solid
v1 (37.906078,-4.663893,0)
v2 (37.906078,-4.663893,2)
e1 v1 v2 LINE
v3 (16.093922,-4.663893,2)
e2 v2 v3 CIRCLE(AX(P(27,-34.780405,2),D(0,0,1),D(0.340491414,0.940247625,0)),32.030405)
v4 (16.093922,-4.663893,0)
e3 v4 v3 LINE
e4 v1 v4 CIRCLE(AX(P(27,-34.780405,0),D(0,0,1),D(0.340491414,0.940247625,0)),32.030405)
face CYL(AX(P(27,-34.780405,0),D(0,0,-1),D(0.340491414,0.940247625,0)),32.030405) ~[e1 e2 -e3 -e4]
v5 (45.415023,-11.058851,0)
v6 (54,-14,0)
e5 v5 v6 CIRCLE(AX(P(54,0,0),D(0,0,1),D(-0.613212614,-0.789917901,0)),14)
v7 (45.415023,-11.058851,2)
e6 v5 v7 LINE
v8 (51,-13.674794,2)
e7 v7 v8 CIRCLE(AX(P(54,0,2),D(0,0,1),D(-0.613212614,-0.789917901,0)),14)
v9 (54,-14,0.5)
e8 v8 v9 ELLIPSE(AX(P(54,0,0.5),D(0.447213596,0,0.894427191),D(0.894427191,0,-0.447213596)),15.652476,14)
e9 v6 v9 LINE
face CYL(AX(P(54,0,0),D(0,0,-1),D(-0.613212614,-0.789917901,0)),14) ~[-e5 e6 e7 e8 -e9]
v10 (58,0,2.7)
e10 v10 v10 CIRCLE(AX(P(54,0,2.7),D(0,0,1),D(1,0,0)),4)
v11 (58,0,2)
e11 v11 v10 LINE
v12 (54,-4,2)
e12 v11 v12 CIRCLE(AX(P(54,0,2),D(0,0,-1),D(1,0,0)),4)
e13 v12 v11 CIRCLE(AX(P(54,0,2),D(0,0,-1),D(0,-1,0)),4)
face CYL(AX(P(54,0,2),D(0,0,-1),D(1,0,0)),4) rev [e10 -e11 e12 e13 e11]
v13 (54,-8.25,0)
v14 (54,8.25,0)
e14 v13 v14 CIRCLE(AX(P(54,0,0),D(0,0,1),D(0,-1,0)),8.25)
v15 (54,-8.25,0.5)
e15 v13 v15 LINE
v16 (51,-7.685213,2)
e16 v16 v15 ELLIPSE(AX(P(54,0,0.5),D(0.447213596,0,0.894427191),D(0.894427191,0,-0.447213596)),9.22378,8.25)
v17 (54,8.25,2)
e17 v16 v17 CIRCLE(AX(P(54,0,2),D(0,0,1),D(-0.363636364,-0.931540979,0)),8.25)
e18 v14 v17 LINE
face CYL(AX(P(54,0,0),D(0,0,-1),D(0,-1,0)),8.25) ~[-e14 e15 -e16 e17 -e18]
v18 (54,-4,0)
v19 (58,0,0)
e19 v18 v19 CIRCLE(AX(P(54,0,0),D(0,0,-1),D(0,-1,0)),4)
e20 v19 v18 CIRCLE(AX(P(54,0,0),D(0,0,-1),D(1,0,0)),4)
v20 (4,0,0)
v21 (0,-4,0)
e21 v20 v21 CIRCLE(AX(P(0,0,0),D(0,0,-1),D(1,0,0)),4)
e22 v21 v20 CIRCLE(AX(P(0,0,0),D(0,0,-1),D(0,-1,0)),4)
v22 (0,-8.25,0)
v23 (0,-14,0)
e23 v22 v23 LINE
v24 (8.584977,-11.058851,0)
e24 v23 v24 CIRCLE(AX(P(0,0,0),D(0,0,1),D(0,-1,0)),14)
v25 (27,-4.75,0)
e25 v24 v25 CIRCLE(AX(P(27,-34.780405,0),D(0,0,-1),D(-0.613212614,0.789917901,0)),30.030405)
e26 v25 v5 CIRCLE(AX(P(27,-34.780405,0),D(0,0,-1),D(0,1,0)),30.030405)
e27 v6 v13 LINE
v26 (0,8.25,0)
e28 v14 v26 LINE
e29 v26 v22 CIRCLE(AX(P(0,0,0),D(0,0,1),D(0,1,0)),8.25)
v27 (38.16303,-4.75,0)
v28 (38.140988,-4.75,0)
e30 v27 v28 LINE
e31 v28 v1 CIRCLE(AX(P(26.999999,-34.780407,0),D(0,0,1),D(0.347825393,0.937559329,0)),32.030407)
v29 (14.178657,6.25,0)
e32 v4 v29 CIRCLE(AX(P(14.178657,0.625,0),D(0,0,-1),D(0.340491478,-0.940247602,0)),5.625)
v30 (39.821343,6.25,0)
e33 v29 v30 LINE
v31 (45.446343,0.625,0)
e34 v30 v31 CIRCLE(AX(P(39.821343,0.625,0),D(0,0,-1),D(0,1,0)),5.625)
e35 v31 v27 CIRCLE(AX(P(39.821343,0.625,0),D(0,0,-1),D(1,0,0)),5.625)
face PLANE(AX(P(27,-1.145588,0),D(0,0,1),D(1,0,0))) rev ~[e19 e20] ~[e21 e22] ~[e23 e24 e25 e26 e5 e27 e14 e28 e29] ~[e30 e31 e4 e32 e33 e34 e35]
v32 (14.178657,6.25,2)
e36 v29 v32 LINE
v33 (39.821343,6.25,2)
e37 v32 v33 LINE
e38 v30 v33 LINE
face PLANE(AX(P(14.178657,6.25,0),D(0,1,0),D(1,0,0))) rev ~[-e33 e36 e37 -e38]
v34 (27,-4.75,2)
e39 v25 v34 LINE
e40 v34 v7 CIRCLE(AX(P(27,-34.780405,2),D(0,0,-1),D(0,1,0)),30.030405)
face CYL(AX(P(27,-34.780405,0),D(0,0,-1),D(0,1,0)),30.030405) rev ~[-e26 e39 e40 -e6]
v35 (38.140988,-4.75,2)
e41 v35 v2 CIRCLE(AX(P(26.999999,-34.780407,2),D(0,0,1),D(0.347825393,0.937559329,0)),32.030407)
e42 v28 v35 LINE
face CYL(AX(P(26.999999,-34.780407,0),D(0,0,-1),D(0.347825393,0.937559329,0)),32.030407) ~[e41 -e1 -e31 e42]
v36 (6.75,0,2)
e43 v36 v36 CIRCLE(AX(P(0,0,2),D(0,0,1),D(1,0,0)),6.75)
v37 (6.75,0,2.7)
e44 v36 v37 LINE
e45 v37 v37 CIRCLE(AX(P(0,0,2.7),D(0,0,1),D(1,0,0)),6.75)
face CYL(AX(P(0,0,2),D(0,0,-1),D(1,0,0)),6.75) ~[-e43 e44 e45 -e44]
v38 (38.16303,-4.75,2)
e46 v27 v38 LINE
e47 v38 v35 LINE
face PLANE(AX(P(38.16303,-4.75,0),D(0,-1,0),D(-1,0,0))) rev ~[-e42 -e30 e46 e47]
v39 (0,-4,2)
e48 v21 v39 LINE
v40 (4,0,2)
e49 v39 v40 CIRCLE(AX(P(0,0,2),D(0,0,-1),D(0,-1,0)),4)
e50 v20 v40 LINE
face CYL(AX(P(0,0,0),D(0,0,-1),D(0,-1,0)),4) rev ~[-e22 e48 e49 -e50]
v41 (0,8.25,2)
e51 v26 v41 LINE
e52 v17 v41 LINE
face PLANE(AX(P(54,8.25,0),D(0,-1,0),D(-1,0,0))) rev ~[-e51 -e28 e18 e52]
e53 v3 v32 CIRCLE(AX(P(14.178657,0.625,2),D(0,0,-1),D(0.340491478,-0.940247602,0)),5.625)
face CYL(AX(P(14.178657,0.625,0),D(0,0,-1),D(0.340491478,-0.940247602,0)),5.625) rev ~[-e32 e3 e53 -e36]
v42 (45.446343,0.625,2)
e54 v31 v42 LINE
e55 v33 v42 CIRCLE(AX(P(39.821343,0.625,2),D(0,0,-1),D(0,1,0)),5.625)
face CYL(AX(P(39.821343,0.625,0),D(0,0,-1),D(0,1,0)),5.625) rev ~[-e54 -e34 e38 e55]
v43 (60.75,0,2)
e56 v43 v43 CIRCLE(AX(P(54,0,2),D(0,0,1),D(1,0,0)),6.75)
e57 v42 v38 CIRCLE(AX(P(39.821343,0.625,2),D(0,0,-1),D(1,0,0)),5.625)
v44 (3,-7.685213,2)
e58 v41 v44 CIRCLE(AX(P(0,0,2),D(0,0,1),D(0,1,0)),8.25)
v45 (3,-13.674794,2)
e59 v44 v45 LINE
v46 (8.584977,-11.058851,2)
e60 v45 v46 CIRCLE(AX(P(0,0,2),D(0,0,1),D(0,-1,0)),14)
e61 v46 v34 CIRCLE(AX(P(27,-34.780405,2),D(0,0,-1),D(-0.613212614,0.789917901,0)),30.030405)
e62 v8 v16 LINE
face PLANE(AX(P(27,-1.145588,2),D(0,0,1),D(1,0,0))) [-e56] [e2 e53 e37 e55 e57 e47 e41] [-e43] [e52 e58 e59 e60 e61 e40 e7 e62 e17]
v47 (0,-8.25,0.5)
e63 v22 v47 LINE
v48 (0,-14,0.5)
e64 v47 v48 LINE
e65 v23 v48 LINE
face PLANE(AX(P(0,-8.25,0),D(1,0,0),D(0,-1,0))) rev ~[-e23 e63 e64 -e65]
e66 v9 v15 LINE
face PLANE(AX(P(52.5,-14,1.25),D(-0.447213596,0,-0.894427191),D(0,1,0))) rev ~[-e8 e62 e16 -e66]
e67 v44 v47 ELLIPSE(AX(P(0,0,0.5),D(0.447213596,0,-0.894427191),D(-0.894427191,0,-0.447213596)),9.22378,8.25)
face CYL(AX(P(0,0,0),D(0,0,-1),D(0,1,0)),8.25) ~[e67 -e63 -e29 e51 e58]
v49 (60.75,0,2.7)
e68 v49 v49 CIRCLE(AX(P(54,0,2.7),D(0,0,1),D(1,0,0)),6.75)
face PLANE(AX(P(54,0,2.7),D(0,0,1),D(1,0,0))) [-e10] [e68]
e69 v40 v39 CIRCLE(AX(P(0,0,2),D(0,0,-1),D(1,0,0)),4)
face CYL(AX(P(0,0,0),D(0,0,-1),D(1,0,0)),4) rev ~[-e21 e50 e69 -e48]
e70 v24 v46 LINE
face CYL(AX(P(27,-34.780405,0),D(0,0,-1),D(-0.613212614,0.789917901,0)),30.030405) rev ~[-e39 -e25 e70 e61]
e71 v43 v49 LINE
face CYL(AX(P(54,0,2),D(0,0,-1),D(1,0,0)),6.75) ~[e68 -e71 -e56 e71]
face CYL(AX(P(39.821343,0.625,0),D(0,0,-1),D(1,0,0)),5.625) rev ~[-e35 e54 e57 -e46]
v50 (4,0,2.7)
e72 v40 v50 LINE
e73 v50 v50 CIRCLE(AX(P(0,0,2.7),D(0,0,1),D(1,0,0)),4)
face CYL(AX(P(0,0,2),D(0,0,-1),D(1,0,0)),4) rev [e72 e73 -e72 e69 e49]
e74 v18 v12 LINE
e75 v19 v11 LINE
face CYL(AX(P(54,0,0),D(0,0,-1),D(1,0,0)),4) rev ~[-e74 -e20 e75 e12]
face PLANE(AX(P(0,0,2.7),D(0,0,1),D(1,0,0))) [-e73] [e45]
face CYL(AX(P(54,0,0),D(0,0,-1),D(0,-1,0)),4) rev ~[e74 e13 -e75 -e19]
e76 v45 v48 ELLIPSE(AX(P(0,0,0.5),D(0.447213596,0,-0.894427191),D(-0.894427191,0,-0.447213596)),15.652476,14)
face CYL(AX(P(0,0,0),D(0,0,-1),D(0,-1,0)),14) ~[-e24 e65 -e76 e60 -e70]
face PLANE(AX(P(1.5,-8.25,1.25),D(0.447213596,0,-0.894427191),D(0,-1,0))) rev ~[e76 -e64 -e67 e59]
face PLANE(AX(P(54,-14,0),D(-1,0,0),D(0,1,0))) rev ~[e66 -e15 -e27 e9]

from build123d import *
from build123d import SkipClean  # not in build123d's __all__

# Parameters (mm, degrees)
F1_DEPTH = 2
F2_R     = 6.75
F2_R_2   = 4
F3_DEPTH = 0.7
F4_SIZE2 = 1.5
F4_SIZE  = 3


with BuildPart() as f1:
    # F0 (on Top) → F1 (new body)
    with BuildSketch(Plane.XY):
        with BuildLine():
            ThreePointArc((0, 8.25), (-8.25, 0), (0, -8.25))
            Line((0, -8.25), (0, -14))
            ThreePointArc((0, -14), (4.5374051759, -13.2443178107), (8.5849765979, -11.05885061))
            ThreePointArc((8.5849765979, -11.05885061), (17.2671345057, -6.3709601788), (27, -4.75))
            ThreePointArc((27, -4.75), (36.7328654943, -6.3709601788), (45.4150234021, -11.05885061))
            ThreePointArc((45.4150234021, -11.05885061), (49.4625948241, -13.2443178107), (54, -14))
            Line((54, -14), (54, -8.25))
            ThreePointArc((54, -8.25), (62.25, 0), (54, 8.25))
            Line((54, 8.25), (0, 8.25))
        make_face()
        with BuildLine():
            ThreePointArc((0, -4), (-2.8284271247, 2.8284271247), (4, 0))
            ThreePointArc((4, 0), (2.8284271247, -2.8284271247), (0, -4))
        make_face(mode=Mode.SUBTRACT)
        with BuildLine():
            Line((38.1630301369, -4.75), (38.1409883593, -4.75))
            ThreePointArc((38.1409883593, -4.75), (38.0236172708, -4.7067170267), (37.9060780323, -4.6638927855))
            ThreePointArc((37.9060780323, -4.6638927855), (27.0000000348, -2.75), (16.0939220331, -4.6638927618))
            ThreePointArc((16.0939220331, -4.6638927618), (8.6383214319, -0.3472662226), (14.1786574679, 6.25))
            Line((14.1786574679, 6.25), (39.8213425321, 6.25))
            ThreePointArc((39.8213425321, 6.25), (43.7988181762, 4.6024756442), (45.4463425321, 0.625))
            ThreePointArc((45.4463425321, 0.625), (43.1614486514, -3.9009602419), (38.1630301369, -4.75))
        make_face(mode=Mode.SUBTRACT)
        with BuildLine():
            ThreePointArc((58, 0), (56.8284271247, -2.8284271247), (54, -4))
            ThreePointArc((54, -4), (51.1715728753, 2.8284271247), (58, 0))
        make_face(mode=Mode.SUBTRACT)
    extrude(amount=F1_DEPTH)

    # F2 (on face) → F3 (join)
    with BuildSketch(Plane.XY.offset(2)):
        Circle(F2_R)
        Circle(F2_R_2, mode=Mode.SUBTRACT)
        with Locations((54, 0)):
            Circle(F2_R)
        with Locations((54, 0)):
            Circle(F2_R_2, mode=Mode.SUBTRACT)
    with SkipClean():  # cleaning this boolean's faces spoils the solid; the shape is the same uncleaned
        extrude(amount=F3_DEPTH)

    # F4
    f4_edges = [f1.edges().sort_by_distance(p)[0] for p in [
        (0, -11.125, 2),
        (54, -11.125, 2),
    ]]
    f4_side = f1.faces().sort_by_distance((49.702195, -12.544944, 2))[0]
    chamfer(f4_edges, length=F4_SIZE, length2=F4_SIZE2, reference=f4_side)


solid = f1.part
